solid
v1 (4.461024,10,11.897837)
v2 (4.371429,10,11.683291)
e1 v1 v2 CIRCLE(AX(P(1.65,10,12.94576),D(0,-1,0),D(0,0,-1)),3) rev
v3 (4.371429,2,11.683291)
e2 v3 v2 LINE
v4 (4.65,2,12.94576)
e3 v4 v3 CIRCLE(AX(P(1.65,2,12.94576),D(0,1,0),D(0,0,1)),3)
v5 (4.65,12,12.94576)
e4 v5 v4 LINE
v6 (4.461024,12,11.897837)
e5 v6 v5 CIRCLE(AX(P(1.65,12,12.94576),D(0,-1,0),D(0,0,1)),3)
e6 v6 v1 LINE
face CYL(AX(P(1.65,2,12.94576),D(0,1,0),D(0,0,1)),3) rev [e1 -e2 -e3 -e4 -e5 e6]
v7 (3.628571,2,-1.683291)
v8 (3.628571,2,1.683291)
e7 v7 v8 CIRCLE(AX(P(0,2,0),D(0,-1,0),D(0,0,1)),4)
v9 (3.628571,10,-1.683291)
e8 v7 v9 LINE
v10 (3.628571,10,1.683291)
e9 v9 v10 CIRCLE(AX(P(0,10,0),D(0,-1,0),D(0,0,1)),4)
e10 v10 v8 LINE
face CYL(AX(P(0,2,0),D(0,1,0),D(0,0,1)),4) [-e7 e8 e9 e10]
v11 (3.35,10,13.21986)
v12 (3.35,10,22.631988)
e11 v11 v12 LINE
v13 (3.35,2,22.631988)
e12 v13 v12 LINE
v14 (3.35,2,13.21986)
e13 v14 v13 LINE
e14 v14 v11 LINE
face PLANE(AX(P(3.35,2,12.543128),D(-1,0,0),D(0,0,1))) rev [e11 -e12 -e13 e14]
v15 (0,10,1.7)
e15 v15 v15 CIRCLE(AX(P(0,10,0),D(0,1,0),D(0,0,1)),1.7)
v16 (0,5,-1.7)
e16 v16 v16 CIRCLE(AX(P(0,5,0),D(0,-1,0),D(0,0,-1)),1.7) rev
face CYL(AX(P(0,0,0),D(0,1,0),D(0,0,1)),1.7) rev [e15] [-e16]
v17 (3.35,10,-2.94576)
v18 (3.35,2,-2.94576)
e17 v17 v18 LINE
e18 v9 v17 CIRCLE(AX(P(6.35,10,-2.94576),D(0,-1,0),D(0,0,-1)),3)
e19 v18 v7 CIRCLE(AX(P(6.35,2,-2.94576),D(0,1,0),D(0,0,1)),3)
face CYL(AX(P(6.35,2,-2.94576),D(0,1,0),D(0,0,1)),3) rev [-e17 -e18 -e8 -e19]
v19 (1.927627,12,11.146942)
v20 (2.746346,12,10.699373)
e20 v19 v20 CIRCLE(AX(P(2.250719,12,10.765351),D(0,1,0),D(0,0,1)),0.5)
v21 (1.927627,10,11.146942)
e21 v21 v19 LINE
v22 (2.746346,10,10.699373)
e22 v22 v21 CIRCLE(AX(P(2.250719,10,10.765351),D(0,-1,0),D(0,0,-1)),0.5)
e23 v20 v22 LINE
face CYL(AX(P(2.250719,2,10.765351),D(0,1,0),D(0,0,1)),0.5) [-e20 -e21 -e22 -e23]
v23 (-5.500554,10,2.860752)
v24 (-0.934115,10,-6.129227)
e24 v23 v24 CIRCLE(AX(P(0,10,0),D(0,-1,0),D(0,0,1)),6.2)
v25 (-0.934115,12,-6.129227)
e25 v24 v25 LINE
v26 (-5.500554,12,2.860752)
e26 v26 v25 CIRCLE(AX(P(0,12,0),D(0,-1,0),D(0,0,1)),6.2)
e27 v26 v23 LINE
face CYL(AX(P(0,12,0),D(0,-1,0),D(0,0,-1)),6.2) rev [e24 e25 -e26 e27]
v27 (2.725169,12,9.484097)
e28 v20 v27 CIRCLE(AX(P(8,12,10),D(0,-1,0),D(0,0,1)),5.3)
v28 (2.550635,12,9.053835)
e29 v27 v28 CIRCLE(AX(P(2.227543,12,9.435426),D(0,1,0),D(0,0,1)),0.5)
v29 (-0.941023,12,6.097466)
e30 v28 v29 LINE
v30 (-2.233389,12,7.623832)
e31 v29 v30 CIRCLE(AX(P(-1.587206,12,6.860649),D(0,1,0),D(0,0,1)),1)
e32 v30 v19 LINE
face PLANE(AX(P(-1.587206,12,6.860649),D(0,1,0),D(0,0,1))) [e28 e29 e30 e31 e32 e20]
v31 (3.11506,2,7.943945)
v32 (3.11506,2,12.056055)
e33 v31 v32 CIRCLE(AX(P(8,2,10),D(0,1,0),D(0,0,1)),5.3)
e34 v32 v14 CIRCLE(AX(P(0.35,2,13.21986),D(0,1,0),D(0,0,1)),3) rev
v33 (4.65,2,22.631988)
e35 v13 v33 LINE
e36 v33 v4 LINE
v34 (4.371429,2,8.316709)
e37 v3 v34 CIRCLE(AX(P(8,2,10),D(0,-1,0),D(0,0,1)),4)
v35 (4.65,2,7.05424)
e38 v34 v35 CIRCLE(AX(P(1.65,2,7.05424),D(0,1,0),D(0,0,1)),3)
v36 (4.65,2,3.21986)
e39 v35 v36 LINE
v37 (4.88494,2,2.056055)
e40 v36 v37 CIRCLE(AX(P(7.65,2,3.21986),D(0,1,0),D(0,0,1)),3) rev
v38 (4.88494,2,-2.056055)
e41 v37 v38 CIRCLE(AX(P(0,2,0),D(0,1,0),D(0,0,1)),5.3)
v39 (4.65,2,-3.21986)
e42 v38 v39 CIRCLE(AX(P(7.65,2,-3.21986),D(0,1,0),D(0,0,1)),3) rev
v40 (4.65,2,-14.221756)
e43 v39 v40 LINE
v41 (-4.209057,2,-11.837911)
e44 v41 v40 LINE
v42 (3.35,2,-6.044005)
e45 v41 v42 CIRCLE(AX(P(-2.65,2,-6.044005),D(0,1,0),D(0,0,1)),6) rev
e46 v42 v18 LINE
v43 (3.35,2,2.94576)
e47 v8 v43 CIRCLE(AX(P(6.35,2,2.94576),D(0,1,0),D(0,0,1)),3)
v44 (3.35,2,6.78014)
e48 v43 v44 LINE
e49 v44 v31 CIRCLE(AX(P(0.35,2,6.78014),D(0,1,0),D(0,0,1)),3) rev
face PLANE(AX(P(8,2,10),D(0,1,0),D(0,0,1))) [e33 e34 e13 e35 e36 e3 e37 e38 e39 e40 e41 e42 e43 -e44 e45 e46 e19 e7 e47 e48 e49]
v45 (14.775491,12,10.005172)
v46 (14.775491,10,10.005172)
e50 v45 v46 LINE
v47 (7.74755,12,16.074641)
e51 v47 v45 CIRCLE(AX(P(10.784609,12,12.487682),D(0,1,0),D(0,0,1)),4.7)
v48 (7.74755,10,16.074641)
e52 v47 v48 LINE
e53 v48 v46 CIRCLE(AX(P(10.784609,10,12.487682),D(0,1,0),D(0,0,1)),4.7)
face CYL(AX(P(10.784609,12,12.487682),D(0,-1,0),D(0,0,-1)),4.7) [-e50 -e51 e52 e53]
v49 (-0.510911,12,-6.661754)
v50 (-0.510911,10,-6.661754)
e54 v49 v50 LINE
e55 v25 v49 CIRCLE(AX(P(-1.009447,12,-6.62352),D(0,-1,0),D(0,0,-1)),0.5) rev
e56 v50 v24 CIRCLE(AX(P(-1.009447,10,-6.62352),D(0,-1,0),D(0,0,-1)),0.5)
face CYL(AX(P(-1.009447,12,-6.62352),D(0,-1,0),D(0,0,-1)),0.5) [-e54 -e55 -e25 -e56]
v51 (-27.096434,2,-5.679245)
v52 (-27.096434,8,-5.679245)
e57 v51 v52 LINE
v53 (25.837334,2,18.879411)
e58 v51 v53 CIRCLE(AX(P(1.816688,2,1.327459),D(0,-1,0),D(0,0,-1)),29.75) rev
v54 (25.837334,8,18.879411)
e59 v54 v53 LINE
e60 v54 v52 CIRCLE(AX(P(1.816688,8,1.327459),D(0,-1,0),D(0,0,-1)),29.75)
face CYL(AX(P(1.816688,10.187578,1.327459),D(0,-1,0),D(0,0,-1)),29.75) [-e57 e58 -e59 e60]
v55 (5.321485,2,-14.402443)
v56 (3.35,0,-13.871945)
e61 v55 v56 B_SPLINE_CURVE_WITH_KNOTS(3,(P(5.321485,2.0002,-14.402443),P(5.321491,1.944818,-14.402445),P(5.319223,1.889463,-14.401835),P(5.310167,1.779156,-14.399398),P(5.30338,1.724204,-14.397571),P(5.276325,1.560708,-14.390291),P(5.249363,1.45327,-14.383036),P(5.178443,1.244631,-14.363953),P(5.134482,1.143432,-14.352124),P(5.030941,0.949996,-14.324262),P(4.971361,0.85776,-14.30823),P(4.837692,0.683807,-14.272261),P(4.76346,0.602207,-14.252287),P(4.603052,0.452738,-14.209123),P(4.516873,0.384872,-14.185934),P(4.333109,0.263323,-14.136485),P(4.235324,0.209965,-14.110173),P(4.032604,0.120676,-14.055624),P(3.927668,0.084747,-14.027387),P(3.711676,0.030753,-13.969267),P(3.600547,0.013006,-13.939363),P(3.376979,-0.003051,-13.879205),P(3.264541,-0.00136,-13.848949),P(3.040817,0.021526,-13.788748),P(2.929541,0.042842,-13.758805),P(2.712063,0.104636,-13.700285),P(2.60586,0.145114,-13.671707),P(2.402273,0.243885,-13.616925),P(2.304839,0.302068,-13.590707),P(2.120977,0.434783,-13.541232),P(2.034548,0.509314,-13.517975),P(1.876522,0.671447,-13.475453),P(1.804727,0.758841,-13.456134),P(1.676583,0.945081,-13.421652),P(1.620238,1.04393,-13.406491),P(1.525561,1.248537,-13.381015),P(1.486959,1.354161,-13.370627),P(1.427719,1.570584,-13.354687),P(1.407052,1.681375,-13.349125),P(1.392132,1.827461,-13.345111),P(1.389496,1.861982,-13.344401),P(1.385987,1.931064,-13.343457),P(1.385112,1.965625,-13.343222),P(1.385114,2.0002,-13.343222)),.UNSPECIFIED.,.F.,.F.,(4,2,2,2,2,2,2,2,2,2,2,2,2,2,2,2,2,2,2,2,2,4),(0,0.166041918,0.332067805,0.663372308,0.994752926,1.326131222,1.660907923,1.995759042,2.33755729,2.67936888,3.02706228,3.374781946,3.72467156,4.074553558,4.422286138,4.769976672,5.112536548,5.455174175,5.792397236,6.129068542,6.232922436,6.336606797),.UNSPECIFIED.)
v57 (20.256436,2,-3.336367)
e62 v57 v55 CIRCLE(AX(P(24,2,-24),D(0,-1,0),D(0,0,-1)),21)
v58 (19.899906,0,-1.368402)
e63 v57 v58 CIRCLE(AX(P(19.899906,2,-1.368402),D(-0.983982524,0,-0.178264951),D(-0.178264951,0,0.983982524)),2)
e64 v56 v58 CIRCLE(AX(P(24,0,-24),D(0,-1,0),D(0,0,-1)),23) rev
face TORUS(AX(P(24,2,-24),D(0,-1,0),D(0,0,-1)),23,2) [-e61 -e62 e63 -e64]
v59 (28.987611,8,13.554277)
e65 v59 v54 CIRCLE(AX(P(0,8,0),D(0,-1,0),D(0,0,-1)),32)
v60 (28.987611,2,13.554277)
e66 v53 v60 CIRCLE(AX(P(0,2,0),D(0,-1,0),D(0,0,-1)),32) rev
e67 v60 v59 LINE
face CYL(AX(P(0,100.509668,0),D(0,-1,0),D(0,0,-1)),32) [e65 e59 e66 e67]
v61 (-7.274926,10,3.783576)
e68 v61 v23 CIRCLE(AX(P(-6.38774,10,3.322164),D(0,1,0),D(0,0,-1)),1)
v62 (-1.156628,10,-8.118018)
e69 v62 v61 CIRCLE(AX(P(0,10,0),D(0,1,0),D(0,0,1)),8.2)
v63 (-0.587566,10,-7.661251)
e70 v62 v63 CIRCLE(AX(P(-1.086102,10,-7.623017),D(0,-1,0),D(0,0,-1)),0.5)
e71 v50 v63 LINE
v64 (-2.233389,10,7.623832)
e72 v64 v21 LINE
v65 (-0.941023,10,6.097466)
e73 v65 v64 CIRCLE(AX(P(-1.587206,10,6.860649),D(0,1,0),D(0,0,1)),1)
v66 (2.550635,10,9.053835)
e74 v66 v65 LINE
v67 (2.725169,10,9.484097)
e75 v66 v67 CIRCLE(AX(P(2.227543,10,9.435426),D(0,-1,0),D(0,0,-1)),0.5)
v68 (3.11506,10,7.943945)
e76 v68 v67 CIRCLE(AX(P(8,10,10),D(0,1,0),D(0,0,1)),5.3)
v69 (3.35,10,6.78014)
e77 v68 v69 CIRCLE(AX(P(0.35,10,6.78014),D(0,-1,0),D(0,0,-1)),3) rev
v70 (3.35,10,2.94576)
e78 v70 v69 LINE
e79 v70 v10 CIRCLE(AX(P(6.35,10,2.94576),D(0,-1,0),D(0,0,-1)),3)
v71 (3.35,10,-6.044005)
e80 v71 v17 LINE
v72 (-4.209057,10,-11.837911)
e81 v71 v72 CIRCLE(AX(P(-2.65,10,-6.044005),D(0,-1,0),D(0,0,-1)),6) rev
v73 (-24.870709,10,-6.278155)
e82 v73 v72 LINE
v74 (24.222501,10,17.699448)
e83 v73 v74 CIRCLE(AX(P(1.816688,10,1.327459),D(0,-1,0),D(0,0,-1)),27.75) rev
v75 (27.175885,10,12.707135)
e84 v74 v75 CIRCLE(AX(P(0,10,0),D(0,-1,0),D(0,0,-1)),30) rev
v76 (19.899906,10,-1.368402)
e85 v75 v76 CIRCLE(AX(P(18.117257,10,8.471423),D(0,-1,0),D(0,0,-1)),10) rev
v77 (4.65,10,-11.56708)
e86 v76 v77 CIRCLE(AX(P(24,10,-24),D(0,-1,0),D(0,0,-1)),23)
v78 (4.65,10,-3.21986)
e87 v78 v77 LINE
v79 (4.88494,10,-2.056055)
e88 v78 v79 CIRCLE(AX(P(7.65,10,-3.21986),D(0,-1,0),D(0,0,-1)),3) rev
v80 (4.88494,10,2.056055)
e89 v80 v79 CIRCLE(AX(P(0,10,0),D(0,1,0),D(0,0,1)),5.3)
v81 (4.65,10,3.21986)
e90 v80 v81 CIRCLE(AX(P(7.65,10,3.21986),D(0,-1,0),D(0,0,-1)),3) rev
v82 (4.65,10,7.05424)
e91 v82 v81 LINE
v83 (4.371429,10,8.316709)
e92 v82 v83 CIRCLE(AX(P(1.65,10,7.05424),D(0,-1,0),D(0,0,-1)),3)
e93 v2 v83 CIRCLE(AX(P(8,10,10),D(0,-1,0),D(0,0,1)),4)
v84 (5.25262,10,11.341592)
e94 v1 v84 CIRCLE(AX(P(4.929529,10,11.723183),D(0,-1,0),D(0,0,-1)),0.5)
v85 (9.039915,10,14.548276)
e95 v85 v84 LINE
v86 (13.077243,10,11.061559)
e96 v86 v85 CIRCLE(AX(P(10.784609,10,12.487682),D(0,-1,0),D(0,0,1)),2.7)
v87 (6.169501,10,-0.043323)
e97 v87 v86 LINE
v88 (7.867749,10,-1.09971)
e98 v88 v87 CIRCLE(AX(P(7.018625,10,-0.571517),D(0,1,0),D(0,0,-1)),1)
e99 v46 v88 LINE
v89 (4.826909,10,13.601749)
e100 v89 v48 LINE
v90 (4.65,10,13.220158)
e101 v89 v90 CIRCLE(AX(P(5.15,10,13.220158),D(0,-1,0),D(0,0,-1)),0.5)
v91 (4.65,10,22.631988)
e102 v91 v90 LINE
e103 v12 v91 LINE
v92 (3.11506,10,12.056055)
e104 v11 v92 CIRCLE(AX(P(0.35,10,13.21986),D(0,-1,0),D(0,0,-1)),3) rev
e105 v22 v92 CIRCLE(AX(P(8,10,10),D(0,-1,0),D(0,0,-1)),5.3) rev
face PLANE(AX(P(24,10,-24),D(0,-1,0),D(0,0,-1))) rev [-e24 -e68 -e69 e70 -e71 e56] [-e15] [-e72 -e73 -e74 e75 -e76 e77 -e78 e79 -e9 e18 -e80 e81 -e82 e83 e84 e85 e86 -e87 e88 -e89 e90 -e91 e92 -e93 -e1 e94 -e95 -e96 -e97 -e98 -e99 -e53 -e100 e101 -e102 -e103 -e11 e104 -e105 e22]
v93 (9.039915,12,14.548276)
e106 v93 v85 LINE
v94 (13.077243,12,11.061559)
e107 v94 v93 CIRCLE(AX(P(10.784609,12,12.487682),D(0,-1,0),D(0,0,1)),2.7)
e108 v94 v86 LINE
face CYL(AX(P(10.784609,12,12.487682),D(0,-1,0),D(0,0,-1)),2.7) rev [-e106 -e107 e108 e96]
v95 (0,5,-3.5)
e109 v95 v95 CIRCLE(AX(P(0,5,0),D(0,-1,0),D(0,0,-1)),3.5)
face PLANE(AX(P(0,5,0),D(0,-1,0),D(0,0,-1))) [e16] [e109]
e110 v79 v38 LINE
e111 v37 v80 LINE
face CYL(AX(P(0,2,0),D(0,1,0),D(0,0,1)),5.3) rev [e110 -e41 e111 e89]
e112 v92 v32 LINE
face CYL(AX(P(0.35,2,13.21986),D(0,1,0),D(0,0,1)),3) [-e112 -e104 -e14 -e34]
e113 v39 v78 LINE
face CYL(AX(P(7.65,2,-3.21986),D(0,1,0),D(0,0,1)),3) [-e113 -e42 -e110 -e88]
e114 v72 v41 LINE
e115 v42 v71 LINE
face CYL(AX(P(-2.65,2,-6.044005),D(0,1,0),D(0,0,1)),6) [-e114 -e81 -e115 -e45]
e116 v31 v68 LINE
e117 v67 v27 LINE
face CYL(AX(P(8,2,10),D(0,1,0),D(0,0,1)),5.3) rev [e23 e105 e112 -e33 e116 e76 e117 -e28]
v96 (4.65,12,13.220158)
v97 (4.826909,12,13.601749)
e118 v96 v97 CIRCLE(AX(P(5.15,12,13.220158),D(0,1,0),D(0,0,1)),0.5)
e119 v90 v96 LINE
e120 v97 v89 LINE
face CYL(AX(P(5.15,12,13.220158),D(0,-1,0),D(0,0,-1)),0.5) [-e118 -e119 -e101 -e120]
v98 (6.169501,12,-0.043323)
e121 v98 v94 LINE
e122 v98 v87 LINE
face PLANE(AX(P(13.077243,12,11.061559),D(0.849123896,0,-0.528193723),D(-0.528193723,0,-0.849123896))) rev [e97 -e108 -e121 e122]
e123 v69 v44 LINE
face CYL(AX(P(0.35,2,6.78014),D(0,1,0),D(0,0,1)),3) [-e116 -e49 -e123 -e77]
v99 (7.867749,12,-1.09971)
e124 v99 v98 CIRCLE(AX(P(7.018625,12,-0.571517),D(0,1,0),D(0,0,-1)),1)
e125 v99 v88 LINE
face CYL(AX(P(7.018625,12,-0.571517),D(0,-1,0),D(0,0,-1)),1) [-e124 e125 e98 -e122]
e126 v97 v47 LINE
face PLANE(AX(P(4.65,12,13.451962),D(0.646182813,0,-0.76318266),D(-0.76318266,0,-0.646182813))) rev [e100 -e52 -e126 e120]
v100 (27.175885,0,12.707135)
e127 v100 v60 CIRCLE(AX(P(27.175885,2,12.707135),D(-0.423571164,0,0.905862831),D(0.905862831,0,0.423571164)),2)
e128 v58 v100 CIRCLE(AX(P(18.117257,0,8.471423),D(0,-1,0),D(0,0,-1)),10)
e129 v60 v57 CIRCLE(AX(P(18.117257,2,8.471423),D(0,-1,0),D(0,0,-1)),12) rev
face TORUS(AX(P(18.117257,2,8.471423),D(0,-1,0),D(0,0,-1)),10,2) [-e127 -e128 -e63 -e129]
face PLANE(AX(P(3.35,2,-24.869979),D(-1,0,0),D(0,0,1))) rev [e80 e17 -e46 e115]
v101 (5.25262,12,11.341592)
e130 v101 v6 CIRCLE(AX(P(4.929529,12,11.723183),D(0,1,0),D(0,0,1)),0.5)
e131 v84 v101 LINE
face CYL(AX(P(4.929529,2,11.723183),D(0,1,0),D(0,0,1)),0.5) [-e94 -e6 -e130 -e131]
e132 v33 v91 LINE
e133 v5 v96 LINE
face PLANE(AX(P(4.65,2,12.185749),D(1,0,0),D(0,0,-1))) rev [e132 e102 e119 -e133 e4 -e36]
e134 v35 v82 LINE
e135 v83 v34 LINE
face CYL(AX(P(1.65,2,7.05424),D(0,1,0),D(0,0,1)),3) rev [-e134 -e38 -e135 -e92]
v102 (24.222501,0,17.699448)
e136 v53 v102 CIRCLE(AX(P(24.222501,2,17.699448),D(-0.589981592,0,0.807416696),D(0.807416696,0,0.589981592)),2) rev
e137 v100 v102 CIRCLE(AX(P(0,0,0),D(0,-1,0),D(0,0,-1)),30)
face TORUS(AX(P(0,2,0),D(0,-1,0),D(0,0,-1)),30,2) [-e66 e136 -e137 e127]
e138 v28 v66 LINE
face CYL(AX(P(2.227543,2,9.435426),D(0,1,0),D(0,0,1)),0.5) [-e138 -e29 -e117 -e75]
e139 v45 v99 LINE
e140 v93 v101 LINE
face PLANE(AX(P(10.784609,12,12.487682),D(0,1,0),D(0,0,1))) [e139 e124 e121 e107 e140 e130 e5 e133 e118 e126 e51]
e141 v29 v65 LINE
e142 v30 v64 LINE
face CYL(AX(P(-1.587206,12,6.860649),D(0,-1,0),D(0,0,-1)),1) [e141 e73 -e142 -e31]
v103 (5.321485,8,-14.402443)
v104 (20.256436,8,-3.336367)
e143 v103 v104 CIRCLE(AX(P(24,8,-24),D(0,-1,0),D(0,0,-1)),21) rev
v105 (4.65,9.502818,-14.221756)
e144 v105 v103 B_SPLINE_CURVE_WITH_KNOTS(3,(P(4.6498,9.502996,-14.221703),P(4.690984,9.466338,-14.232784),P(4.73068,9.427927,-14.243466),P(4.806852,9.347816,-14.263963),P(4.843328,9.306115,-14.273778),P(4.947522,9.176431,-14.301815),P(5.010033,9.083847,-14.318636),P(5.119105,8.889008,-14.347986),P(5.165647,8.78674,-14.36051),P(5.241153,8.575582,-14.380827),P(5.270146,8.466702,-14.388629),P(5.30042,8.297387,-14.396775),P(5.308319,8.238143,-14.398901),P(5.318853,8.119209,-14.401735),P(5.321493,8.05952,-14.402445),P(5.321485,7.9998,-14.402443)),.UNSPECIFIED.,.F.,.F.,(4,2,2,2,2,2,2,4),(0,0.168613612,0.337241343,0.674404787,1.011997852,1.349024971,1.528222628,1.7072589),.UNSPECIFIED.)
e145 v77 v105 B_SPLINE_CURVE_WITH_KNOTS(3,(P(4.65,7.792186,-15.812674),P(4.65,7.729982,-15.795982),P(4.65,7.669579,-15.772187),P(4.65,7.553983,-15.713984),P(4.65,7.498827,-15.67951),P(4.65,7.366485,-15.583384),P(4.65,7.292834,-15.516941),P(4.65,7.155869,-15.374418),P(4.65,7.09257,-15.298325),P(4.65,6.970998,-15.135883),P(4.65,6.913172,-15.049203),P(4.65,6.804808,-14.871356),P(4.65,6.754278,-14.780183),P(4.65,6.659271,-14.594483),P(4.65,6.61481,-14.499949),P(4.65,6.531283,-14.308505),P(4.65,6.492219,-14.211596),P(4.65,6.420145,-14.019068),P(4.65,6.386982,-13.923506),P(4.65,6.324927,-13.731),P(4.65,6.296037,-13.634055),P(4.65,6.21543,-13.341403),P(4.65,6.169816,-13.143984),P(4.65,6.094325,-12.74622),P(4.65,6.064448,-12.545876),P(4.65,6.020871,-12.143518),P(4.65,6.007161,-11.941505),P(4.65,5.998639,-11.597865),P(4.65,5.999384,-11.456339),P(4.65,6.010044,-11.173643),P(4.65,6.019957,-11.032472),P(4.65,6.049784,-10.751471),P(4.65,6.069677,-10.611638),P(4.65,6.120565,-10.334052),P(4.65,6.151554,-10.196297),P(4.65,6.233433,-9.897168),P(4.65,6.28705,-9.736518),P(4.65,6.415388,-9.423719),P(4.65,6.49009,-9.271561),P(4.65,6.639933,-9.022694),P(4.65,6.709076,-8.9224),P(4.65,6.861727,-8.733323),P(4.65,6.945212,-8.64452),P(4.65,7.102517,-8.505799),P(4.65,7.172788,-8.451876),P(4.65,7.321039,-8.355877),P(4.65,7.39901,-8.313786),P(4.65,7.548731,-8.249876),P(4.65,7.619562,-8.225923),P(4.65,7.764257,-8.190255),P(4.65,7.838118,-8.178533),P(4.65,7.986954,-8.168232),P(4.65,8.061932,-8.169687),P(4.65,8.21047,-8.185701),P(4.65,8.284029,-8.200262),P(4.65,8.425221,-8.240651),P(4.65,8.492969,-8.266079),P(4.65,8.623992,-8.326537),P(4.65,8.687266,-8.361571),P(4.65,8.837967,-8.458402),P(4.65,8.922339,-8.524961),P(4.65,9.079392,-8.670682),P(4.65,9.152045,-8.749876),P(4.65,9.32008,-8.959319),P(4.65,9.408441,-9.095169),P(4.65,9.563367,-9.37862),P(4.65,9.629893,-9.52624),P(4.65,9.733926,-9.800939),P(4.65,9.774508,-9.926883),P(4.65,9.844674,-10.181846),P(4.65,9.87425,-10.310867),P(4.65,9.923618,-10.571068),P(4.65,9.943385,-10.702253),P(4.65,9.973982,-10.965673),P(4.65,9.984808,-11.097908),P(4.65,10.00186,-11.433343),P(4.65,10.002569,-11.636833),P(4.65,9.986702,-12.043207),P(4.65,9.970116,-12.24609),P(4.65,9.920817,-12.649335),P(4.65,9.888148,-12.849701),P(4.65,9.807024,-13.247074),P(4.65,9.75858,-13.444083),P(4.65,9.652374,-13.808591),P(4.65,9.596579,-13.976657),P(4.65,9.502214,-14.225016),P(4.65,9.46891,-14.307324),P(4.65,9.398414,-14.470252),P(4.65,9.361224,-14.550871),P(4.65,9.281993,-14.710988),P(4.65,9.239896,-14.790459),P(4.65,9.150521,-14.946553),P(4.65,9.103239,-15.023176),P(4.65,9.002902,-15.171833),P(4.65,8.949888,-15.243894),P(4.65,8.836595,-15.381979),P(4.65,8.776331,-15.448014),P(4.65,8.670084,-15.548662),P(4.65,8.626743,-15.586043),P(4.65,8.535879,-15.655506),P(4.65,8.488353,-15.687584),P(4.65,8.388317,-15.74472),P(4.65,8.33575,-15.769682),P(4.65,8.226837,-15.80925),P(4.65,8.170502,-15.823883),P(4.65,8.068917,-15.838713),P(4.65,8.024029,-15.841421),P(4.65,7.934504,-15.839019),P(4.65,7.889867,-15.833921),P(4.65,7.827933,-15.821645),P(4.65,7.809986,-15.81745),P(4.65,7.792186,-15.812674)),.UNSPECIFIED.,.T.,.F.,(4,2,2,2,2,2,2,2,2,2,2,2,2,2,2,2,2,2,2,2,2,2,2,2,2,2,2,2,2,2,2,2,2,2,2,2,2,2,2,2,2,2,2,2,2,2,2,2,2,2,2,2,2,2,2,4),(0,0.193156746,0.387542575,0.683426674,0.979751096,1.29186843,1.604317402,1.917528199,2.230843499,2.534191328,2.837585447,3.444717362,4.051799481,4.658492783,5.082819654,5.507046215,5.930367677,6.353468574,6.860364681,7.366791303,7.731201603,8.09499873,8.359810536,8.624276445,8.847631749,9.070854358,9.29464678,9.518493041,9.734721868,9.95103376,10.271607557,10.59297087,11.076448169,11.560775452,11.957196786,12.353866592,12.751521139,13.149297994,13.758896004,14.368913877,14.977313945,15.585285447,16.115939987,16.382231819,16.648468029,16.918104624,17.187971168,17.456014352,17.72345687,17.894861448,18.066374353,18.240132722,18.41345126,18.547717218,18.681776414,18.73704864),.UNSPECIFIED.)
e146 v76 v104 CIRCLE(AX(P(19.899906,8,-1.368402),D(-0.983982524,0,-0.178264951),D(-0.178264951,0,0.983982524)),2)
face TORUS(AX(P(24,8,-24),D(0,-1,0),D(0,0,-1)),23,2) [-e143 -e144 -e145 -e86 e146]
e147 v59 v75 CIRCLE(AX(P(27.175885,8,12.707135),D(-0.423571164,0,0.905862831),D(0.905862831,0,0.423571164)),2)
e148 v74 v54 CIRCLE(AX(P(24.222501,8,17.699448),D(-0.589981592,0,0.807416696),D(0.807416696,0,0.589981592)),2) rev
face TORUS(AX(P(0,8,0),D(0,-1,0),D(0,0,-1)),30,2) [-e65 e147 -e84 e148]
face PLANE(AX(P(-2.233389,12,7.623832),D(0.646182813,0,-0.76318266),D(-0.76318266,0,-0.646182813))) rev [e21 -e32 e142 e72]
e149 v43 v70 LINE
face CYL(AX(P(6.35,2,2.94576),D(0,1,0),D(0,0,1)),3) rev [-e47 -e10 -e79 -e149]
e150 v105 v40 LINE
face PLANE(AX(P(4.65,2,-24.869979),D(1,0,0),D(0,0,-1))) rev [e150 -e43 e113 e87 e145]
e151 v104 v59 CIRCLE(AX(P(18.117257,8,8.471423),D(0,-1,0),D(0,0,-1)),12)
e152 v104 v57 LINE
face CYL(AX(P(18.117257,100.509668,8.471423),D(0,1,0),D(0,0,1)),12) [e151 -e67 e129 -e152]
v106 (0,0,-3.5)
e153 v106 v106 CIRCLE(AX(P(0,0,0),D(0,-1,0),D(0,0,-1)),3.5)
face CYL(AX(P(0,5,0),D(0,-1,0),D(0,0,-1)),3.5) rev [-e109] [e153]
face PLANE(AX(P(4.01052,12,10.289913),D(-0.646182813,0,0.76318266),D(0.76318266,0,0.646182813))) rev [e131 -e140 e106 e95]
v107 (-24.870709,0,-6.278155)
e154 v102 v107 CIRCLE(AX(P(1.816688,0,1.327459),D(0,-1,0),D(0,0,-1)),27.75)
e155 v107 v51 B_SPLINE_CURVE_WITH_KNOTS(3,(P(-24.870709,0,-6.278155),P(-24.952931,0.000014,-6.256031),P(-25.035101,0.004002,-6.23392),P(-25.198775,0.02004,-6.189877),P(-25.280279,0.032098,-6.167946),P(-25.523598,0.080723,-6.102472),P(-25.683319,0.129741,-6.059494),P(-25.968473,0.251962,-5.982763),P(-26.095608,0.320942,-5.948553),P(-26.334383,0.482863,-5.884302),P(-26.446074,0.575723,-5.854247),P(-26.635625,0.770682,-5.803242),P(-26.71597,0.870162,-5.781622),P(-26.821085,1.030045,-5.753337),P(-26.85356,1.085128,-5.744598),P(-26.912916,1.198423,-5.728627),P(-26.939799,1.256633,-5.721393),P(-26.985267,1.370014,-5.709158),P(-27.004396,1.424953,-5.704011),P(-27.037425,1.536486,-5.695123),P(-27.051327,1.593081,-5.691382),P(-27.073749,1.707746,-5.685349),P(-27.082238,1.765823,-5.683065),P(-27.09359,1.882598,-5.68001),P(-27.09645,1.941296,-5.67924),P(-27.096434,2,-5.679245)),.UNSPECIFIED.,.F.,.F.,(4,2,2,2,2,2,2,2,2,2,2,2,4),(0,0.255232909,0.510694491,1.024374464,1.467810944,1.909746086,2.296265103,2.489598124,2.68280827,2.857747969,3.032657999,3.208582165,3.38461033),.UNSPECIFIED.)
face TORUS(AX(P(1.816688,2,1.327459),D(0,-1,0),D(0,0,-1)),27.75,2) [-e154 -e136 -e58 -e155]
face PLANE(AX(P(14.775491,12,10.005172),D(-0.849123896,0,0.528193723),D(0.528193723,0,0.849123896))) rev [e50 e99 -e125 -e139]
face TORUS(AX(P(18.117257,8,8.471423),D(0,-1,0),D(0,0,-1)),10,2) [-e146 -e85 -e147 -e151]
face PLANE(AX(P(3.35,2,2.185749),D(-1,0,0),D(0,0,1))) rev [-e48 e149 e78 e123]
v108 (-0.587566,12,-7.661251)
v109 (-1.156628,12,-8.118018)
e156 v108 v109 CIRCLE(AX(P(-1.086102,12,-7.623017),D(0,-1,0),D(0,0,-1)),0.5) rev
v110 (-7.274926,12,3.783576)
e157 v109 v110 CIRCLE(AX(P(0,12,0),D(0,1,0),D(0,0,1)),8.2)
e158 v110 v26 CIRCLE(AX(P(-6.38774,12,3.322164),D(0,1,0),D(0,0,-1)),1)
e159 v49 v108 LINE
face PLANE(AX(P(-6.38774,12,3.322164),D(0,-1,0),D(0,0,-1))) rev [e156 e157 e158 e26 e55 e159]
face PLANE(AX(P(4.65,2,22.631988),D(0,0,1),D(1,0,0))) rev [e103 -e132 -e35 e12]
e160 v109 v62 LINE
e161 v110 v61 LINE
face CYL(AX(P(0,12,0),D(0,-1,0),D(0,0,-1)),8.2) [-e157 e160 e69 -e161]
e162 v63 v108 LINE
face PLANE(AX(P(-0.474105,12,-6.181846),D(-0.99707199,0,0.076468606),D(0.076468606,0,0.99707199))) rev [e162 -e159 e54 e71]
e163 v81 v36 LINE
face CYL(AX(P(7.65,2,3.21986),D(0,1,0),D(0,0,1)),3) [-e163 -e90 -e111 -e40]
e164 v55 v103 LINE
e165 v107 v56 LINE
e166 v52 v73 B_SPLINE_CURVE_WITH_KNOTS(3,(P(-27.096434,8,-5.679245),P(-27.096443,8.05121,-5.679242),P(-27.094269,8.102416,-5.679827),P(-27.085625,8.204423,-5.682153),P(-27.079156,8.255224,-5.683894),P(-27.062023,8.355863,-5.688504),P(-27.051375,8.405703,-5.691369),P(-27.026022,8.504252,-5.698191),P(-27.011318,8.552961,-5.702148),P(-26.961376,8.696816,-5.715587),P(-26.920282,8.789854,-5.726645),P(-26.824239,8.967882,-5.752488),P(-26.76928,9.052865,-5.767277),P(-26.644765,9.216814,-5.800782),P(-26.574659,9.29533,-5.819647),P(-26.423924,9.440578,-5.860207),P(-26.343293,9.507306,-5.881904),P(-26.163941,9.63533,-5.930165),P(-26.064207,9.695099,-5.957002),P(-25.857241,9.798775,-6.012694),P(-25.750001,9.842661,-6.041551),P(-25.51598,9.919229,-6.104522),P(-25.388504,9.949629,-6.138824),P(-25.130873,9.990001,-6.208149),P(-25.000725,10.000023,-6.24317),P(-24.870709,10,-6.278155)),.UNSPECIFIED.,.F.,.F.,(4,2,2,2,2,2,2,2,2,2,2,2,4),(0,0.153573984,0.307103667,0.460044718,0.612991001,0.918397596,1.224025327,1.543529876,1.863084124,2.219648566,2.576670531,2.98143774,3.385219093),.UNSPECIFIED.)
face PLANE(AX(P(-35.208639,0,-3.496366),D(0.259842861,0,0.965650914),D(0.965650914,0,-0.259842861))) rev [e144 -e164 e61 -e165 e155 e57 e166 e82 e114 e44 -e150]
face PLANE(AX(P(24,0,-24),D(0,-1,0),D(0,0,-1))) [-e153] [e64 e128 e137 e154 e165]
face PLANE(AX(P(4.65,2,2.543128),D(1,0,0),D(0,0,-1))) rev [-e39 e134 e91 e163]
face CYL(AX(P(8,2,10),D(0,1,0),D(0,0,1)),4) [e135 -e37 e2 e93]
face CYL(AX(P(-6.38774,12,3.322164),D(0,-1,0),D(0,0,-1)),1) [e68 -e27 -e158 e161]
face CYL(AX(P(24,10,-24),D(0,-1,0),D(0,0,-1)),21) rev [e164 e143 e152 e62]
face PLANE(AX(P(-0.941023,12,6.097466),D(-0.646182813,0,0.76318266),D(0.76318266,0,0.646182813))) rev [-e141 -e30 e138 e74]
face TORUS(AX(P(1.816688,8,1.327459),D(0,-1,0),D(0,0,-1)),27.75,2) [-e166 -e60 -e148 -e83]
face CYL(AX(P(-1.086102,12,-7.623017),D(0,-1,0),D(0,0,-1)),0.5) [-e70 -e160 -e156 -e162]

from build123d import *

# Parameters (mm, degrees)
BOSS_EXTRUDE1_DEPTH  = 10
BOSS_EXTRUDE8_START  = -10
BOSS_EXTRUDE8_DEPTH  = 10
BOSS_EXTRUDE11_DEPTH = 10
SKETCH10_R           = 1.7000000000000002
CUT_EXTRUDE1_DEPTH   = 47.34652090502587
SKETCH13_R           = 3.5
CUT_EXTRUDE2_DEPTH   = 5
FILLET11_R           = 12
FILLET1_R            = 2
CUT_EXTRUDE5_DEPTH   = 47.346521064692666
CUT_EXTRUDE6_DEPTH   = 8
FILLET12_R           = 3
BOSS_EXTRUDE12_DEPTH = 2
FILLET16_R           = 0.5
CUT_EXTRUDE8_DEPTH   = 10
FILLET22_R           = 6
FILLET23_ANGLE       = 159.751266


with BuildPart() as part:
    # Sketch1 → Boss-Extrude1 (new body)
    with BuildSketch(Plane(origin=(0, 0, 0), x_dir=(1, 0, 0), z_dir=(0, 1, 0))):
        with BuildLine():
            Line((-29, 3.0000000000000027), (-24, 3.0000000000000027))
            ThreePointArc((-24, 3.0000000000000027), (-9.150757595082503, 9.150757595082506), (-3.0000000000000027, 24.000000000000004))
            Line((-3.0000000000000027, 24.000000000000004), (-2.999999999999995, 28.999999999999996))
            Line((-2.999999999999995, 28.999999999999996), (1.4e-16, 28.999999999999993))
            Line((1.4e-16, 28.999999999999993), (2.999999999999999, 28.999999999999996))
            Line((2.999999999999999, 28.999999999999996), (2.999999999999999, 23.999999999999996))
            ThreePointArc((2.999999999999999, 23.999999999999996), (9.150757595082506, 9.1507575950825), (24.000000000000004, 3))
            Line((24.000000000000004, 3), (28.999999999999996, 2.9999999999999933))
            Line((28.999999999999996, 2.9999999999999933), (28.99999999999999, -3.04e-15))
            Line((28.99999999999999, -3.04e-15), (28.999999999999996, -3.0000000000000013))
            Line((28.999999999999996, -3.0000000000000013), (23.999999999999993, -3.0000000000000018))
            ThreePointArc((23.999999999999993, -3.0000000000000018), (9.150757595082498, -9.150757595082506), (2.999999999999999, -24.000000000000007))
            Line((2.999999999999999, -24.000000000000007), (2.9999999999999933, -29))
            Line((2.9999999999999933, -29), (2.17e-15, -28.999999999999996))
            Line((2.17e-15, -28.999999999999996), (-2.9999999999999947, -29.000000000000007))
            Line((-2.9999999999999947, -29.000000000000007), (-2.9999999999999956, -24.000000000000004))
            ThreePointArc((-2.9999999999999956, -24.000000000000004), (-9.150757595082506, -9.150757595082512), (-24, -3.0000000000000115))
            Line((-24, -3.0000000000000115), (-29, -3.000000000000008))
            Line((-29, -3.000000000000008), (-29, 9e-17))
            Line((-29, 9e-17), (-29, 3.0000000000000027))
        make_face()
    extrude(amount=BOSS_EXTRUDE1_DEPTH)

    # Sketch9 → Boss-Extrude8 (add)
    with BuildSketch(Plane(origin=(0, 10, 0), x_dir=(1, 0, 0), z_dir=(0, 1, 0)).offset(BOSS_EXTRUDE8_START)):
        with BuildLine():
            Line((-4.201010126776677, -31.000000000000007), (2.9999999999999942, -31.000000000000007))
            Line((2.9999999999999942, -31.000000000000007), (2.9999999999999933, -29))
            Line((2.9999999999999933, -29), (-2.9999999999999947, -29.000000000000007))
            Line((-2.9999999999999947, -29.000000000000007), (-3.0000000000000027, -24.000000000000004))
            ThreePointArc((-3.0000000000000027, -24.000000000000004), (-3.3024302472767424, -27.551141553241024), (-4.201010126776677, -31.000000000000007))
        make_face()
        with BuildLine():
            Line((-31.000000000000007, -2.999999999999996), (-29, -2.999999999999995))
            Line((-29, -2.999999999999995), (-29.000000000000007, 2.9999999999999933))
            Line((-29.000000000000007, 2.9999999999999933), (-24.000000000000004, 3.0000000000000013))
            ThreePointArc((-24.000000000000004, 3.0000000000000013), (-27.551141553241024, 3.3024302472767424), (-31.000000000000007, 4.2010101267766755))
            Line((-31.000000000000007, 4.2010101267766755), (-31.000000000000007, -2.999999999999996))
        make_face()
        with BuildLine():
            Line((-2.9999999999999982, 31.000000000000007), (-2.9999999999999973, 29))
            Line((-2.9999999999999973, 29), (2.9999999999999916, 29.000000000000007))
            Line((2.9999999999999916, 29.000000000000007), (2.9999999999999996, 24.000000000000004))
            ThreePointArc((2.9999999999999996, 24.000000000000004), (3.302430247276739, 27.551141553241024), (4.201010126776674, 31.00000000000001))
            Line((4.201010126776674, 31.00000000000001), (-2.9999999999999982, 31.000000000000007))
        make_face()
        with BuildLine():
            Line((31.000000000000007, 3), (29, 2.999999999999999))
            Line((29, 2.999999999999999), (29.000000000000007, -2.99999999999999))
            Line((29.000000000000007, -2.99999999999999), (24.000000000000004, -2.9999999999999982))
            ThreePointArc((24.000000000000004, -2.9999999999999982), (27.551141553241024, -3.3024302472767353), (31.00000000000001, -4.201010126776672))
            Line((31.00000000000001, -4.201010126776672), (31.000000000000007, 3))
        make_face()
    extrude(amount=BOSS_EXTRUDE8_DEPTH)

    # Sketch15 → Boss-Extrude11 (add)
    with BuildSketch(Plane.XZ):
        with BuildLine():
            Line((31.000000000000007, -3), (24.000000000000004, -3))
            ThreePointArc((24.000000000000004, -3), (6.853571800517752, -11.875644347017863), (4.201010126776674, -31.00000000000001))
            Line((4.201010126776674, -31.00000000000001), (4.444888692211387, -31.689792749619734))
            ThreePointArc((4.444888692211387, -31.689792749619734), (-23.13590951240458, 22.107231645636396), (31.859064644147985, -3))
            Line((31.859064644147985, -3), (31.000000000000007, -3))
        make_face()
    extrude(amount=-BOSS_EXTRUDE11_DEPTH)

    # Sketch10 → Cut-Extrude1 (cut, through all)
    with BuildSketch(Plane(origin=(0, 10, 0), x_dir=(1, 0, 0), z_dir=(0, 1, 0))):
        with Locations(Location((0, 0, 0), (0, 0, 270))):
            Circle(SKETCH10_R)
    extrude(amount=-CUT_EXTRUDE1_DEPTH, mode=Mode.SUBTRACT)

    # Sketch13 → Cut-Extrude2 (cut)
    with BuildSketch(Plane.XZ):
        with Locations(Location((0, 0, 0), (0, 0, 270))):
            Circle(SKETCH13_R)
    extrude(amount=-CUT_EXTRUDE2_DEPTH, mode=Mode.SUBTRACT)

    # Fillet11
    fillet11_edges = [part.edges().sort_by_distance(p)[0] for p in [
        (31.859064644147985, 5, -2.9999999999999902),
    ]]
    fillet(fillet11_edges, radius=FILLET11_R)

    # Fillet1
    # the kernel refuses this fillet: 2 mm, written as the material it takes off along each edge
    with BuildSketch(Plane(origin=(2.22e-15, 10, 1.33e-15), x_dir=(0.29179218570712273, 0, -0.9564817407354205), z_dir=(0.9564817407354205, 0, 0.29179218570712273))) as fillet1_piece_1:
        with BuildLine():
            CenterArc((32 - FILLET1_R, -FILLET1_R), FILLET1_R, 0, 90)
            Line((32, -FILLET1_R), (32, 0))
            Line((32, 0), (32 - FILLET1_R, 0))
        make_face()
    fillet1_piece_1_solid = revolve(axis=Axis((2.22e-15, 10, 1.33e-15), (0, 1, 0)), revolution_arc=261.9050258296566, mode=Mode.PRIVATE)
    with BuildSketch(Plane(origin=(2.22e-15, 0, 1.33e-15), x_dir=(0.29179218570712273, 0, -0.9564817407354205), z_dir=(0.9564817407354205, 0, 0.29179218570712273))) as fillet1_piece_2:
        with BuildLine():
            CenterArc((32 - FILLET1_R, FILLET1_R), FILLET1_R, 270, 90)
            Line((32 - FILLET1_R, -2.2e-16), (32, 0))
            Line((32, 0), (32, FILLET1_R))
        make_face()
    fillet1_piece_2_solid = revolve(axis=Axis((2.22e-15, 0, 1.33e-15), (0, 1, 0)), revolution_arc=261.9050258296566, mode=Mode.PRIVATE)
    with BuildSketch(Plane(origin=(23.999999999999996, 10, -23.999999999999996), x_dir=(-0.17826495087308294, 0, 0.9839825238743914), z_dir=(0.9839825238743914, 0, 0.17826495087308294))) as fillet1_piece_3:
        with BuildLine():
            CenterArc((20.999999999999993 + FILLET1_R, FILLET1_R), FILLET1_R, 180, 90)
            Line((20.999999999999993, FILLET1_R), (20.999999999999993, 0))
            Line((20.999999999999993, 0), (20.999999999999993 + FILLET1_R, 0))
        make_face()
    fillet1_piece_3_solid = revolve(axis=Axis((23.999999999999996, 10, -23.999999999999996), (0, -1, 0)), revolution_arc=99.20250624888376, mode=Mode.PRIVATE)
    with BuildSketch(Plane(origin=(24.000000000000327, 0, -23.99999999999994), x_dir=(-0.9428090415820639, 0, -0.3333333333333315), z_dir=(0.3333333333333315, 0, -0.9428090415820639))) as fillet1_piece_4:
        with BuildLine():
            CenterArc((21.000000000000327 + FILLET1_R, FILLET1_R), FILLET1_R, 180, 90.00000000000205)
            Line((21.000000000000327 + FILLET1_R, -2.2e-16), (21.000000000000327, 0))
            Line((21.000000000000327, 0), (21.000000000000252, FILLET1_R))
        make_face()
    fillet1_piece_4_solid = revolve(axis=Axis((24.000000000000327, 0, -23.99999999999994), (0, 1, 0)), revolution_arc=99.20250624888268, mode=Mode.PRIVATE)
    with BuildSketch(Plane(origin=(18.117256620069544, 10, 8.471423288433229), x_dir=(0.17826495095489336, 0, -0.9839825238595701), z_dir=(-0.9839825238595701, 0, -0.17826495095489336))) as fillet1_piece_5:
        with BuildLine():
            CenterArc((12.000000000768473 - FILLET1_R, FILLET1_R), FILLET1_R, 270, 90.00000000000006)
            Line((12.000000000768473 + FILLET1_R * 2.454392245e-10, FILLET1_R), (12.000000000768473, 0))
            Line((12.000000000768473, 0), (12.000000000768473 - FILLET1_R, 0))
        make_face()
    fillet1_piece_5_solid = revolve(axis=Axis((18.117256620069544, 10, 8.471423288433229), (0, -1, 0)), revolution_arc=104.79154184638253, mode=Mode.PRIVATE)
    with BuildSketch(Plane(origin=(18.11725662006955, 0, 8.471423288433234), x_dir=(0.17826495095489273, 0, -0.9839825238595703), z_dir=(-0.9839825238595703, 0, -0.17826495095489273))) as fillet1_piece_6:
        with BuildLine():
            CenterArc((12.00000000076848 - FILLET1_R, -FILLET1_R), FILLET1_R, 0, 89.9999999999998)
            Line((12.00000000076848 - FILLET1_R, 2.2e-16), (12.00000000076848, 0))
            Line((12.00000000076848, 0), (12.00000000076848 + FILLET1_R * 2.45428566359e-10, -FILLET1_R))
        make_face()
    fillet1_piece_6_solid = revolve(axis=Axis((18.11725662006955, 0, 8.471423288433234), (0, -1, 0)), revolution_arc=104.79154184638256, mode=Mode.PRIVATE)
    with BuildSketch(Plane(origin=(4.201010126776674, 0, -31.00000000000001), x_dir=(0, 1, 0), z_dir=(0.3333333333333364, 0, -0.9428090415820624))) as fillet1_piece_7:
        with BuildLine():
            CenterArc((FILLET1_R, -FILLET1_R), FILLET1_R, 90, 89.99999999999997)
            Line((-2.2e-16, -FILLET1_R), (0, 0))
            Line((0, 0), (FILLET1_R, 0))
        make_face()
    fillet1_piece_7_solid = extrude(amount=5.731635696304131, mode=Mode.PRIVATE)
    with BuildSketch(Plane(origin=(4.201010126776674, 10, -31.00000000000001), x_dir=(-0.9428090415820624, 0, -0.3333333333333364), z_dir=(0.3333333333333364, 0, -0.9428090415820624))) as fillet1_piece_8:
        with BuildLine():
            CenterArc((FILLET1_R, -FILLET1_R), FILLET1_R, 90, 90)
            Line((-8.4e-16, -FILLET1_R), (0, 0))
            Line((0, 0), (FILLET1_R, 0))
        make_face()
    fillet1_piece_8_solid = extrude(amount=5.731635696304131, mode=Mode.PRIVATE)
    add([fillet1_piece_1_solid, fillet1_piece_2_solid, fillet1_piece_3_solid, fillet1_piece_4_solid, fillet1_piece_5_solid, fillet1_piece_6_solid, fillet1_piece_7_solid, fillet1_piece_8_solid], mode=Mode.SUBTRACT)

    # Sketch19 → Cut-Extrude5 (cut, through all)
    with BuildSketch(Plane.XZ):
        with BuildLine():
            Line((4.201010126776674, -31.00000000000001), (4.444888692211387, -31.689792749619734))
            ThreePointArc((4.444888692211387, -31.689792749619734), (-29.471415770690026, 12.467383545520837), (25.83733427301488, 18.87941094590854))
            ThreePointArc((25.83733427301488, 18.87941094590854), (-15.73526479770299, 25.348105289077708), (-22.20395914087216, -16.224493781640145))
            ThreePointArc((-22.20395914087216, -16.224493781640145), (-12.451434074131708, -24.519620500683775), (0, -27.5))
            Line((0, -27.5), (3.2937207591513458, -27.5))
            ThreePointArc((3.2937207591513458, -27.5), (3.6718986006846066, -29.269562932459532), (4.201010126776674, -31.00000000000001))
        make_face()
    extrude(amount=-CUT_EXTRUDE5_DEPTH, mode=Mode.SUBTRACT)

    # Sketch21 → Cut-Extrude6 (cut)
    with BuildSketch(Plane(origin=(0, 10, 0), x_dir=(1, 0, 0), z_dir=(0, 1, 0))):
        with BuildLine():
            Line((3.3499999999999996, -2.1857492994394403), (3.3500000000000005, -7.456872004794096))
            ThreePointArc((3.3500000000000005, -7.456872004794096), (2.7, -10.000000000000002), (3.3500000000000014, -12.543127995205907))
            Line((3.3500000000000014, -12.543127995205907), (3.3500000000000014, -22.6319878215018))
            Line((3.3500000000000014, -22.6319878215018), (4.6499999999999995, -22.6319878215018))
            Line((4.6499999999999995, -22.6319878215018), (4.6499999999999995, -12.18574929943944))
            ThreePointArc((4.6499999999999995, -12.18574929943944), (3.999999999999999, -10), (4.65, -7.814250700560559))
            Line((4.65, -7.814250700560559), (4.6499999999999995, -2.5431279952059045))
            ThreePointArc((4.6499999999999995, -2.5431279952059045), (5.3, 0), (4.6499999999999995, 2.5431279952059045))
            Line((4.6499999999999995, 2.5431279952059045), (4.649999999999999, 24.86997922175309))
            Line((4.649999999999999, 24.86997922175309), (3.3499999999999983, 24.86997922175309))
            Line((3.3499999999999983, 24.86997922175309), (3.3499999999999996, 2.1857492994394403))
            ThreePointArc((3.3499999999999996, 2.1857492994394403), (4, 0), (3.3499999999999996, -2.1857492994394403))
        make_face()
    extrude(amount=-CUT_EXTRUDE6_DEPTH, mode=Mode.SUBTRACT)

    # Fillet12
    fillet12_edges = [part.edges().sort_by_distance(p)[0] for p in [
        (3.3499999999999996, 6, -2.1857492994394403),
        (3.3500000000000014, 6, 12.543127995205907),
        (3.35, 6, 7.456872004794096),
        (3.3499999999999996, 6, 2.18574929943944),
        (4.65, 6, -2.543127995205904),
        (4.6499999999999995, 6, 2.5431279952059045),
        (4.65, 6, 7.81425070056056),
        (4.65, 6, 12.18574929943944),
    ]]
    fillet(fillet12_edges, radius=FILLET12_R)

    # Sketch22 → Boss-Extrude12 (add)
    with BuildSketch(Plane(origin=(0, 10, 0), x_dir=(1, 0, 0), z_dir=(0, 1, 0))):
        with BuildLine():
            Line((-0.9410232794524035, -6.097466413975398), (2.7565050622575002, -9.228144548591665))
            ThreePointArc((2.7565050622575002, -9.228144548591665), (2.7420947888784566, -10.66665792642172), (3.1150602409638557, -12.056055337433282))
            ThreePointArc((3.1150602409638557, -12.056055337433282), (3.1441141140573974, -12.127648582033496), (3.1713146449834664, -12.199966293083152))
            Line((3.1713146449834664, -12.199966293083152), (-2.233388905668836, -7.623831733344979))
            ThreePointArc((-2.233388905668836, -7.623831733344979), (-2.3503887522454106, -6.214466260551973), (-0.9410232794524035, -6.097466413975398))
        make_face()
        with BuildLine():
            Line((13.077243434064954, -11.061559301183609), (6.169501164246992, 0.04332281597879976))
            ThreePointArc((6.169501164246992, 0.04332281597879976), (6.490431337307185, 1.420640435128268), (7.867748956456652, 1.0997102620680754))
            Line((7.867748956456652, 1.0997102620680754), (14.775491226274623, -10.005171855094346))
            ThreePointArc((14.775491226274623, -10.005171855094346), (13.856588423584014, -16.044779751040444), (7.747549692973299, -16.074640853922645))
            Line((7.747549692973299, -16.074640853922645), (4.650000000000001, -13.451961539936832))
            Line((4.650000000000001, -13.451961539936832), (4.6499999999999995, -12.945759664331089))
            ThreePointArc((4.6499999999999995, -12.945759664331089), (4.579529460023035, -12.299340958802588), (4.371428571428571, -11.683291236760622))
            ThreePointArc((4.371428571428571, -11.683291236760622), (4.1277844849000065, -11.002969094548227), (4.010519991510903, -10.289912507260095))
            Line((4.010519991510903, -10.289912507260095), (9.039915319189735, -14.548275534553065))
            ThreePointArc((9.039915319189735, -14.548275534553065), (12.549363100604399, -14.531121283961152), (13.077243434064954, -11.061559301183609))
        make_face()
        with BuildLine():
            Line((-0.4741053578997305, 6.18184633500468), (-0.6270425701254502, 8.17599031403845))
            ThreePointArc((-0.6270425701254502, 8.17599031403845), (-7.167153081897932, 3.983957417021553), (-7.2749264719064, -3.7835756670582867))
            ThreePointArc((-7.2749264719064, -3.7835756670582867), (-5.926328650081439, -4.209350155454398), (-5.500554161685327, -2.860752333629438))
            ThreePointArc((-5.500554161685327, -2.860752333629438), (-5.41906696436185, 3.012260486040686), (-0.4741053578997305, 6.18184633500468))
        make_face()
    extrude(amount=BOSS_EXTRUDE12_DEPTH)

    # Fillet16
    # the kernel refuses this fillet: 0.5 mm, written as the material it takes off along each edge
    with BuildSketch(Plane(origin=(4.650000000000001, 10, 13.451961539936832), x_dir=(-7.66e-15, 0, -1), z_dir=(0, 1, 0))) as fillet16_piece_1:
        with BuildLine():
            CenterArc((FILLET16_R * 0.463607476404, -FILLET16_R), FILLET16_R, 89.99999999999957, 49.74558323396275)
            Line((-FILLET16_R * 0.299575183281, -FILLET16_R * 0.353817186892), (0, 0))
            Line((0, 0), (FILLET16_R * 0.463607476404, 0))
        make_face()
    extrude(amount=2.5795093455050413, mode=Mode.SUBTRACT)
    with BuildSketch(Plane(origin=(4.010519991510904, 10, 10.289912507260095), x_dir=(0.7631826596847906, 0, 0.646182813108217), z_dir=(0, 1, 0))) as fillet16_piece_2:
        with BuildLine():
            CenterArc((1.627526423263627, -0.5), FILLET16_R, 90.00000000000003, 150.6993809006728)
            Line((1.3828304859089908, -0.9360319922232039), (1.358360892173527, -0.9796351914455242))
            ThreePointArc((1.358360892173527, -0.9796351914455242), (1.1547971954901433, -0.8755568029870049), (-0.03571706855176803, -0.03498987016363905))
            Line((-0.03571706855176803, -0.03498987016363905), (1.3e-16, 0.04999999999999941))
            Line((1.3e-16, 0.04999999999999941), (1.627526423263627, 0.04999999999999934))
            Line((1.627526423263627, 0.04999999999999934), (1.6275264232636268, -1e-16))
        make_face()
    extrude(amount=6.174607798363095, mode=Mode.SUBTRACT)
    with BuildSketch(Plane(origin=(3.1713146449834664, 10, 12.199966293083152), x_dir=(-0.7631826596847914, 0, -0.6461828131082161), z_dir=(0, 1, 0))) as fillet16_piece_3:
        with BuildLine():
            CenterArc((1.6296066509961113, -0.5), FILLET16_R, 89.99999999999994, 137.8371168074777)
            Line((1.2939863772884717, -0.8706197942317832), (1.2604243499177077, -0.9076817736549612))
            ThreePointArc((1.2604243499177077, -0.9076817736549612), (0.11328825017861112, -0.1180618856839784), (-0.0249023411896119, -0.04335750688492294))
            Line((-0.0249023411896119, -0.04335750688492294), (5.2e-16, 0.0499999999999997))
            Line((5.2e-16, 0.0499999999999997), (1.6296066509961122, 0.04999999999999945))
            Line((1.6296066509961122, 0.04999999999999945), (1.6296066509961118, -1.2e-16))
        make_face()
    extrude(amount=6.0740166274902805, mode=Mode.SUBTRACT)
    with BuildSketch(Plane(origin=(2.7565050622575002, 10, 9.228144548591665), x_dir=(-0.12152264594318536, 0, 0.9925886592758187), z_dir=(0, 1, 0))) as fillet16_piece_4:
        with BuildLine():
            CenterArc((0.27002653512611713, -0.4998520308409607), FILLET16_R, 91.39395560283157, 55.3316145811082)
            Line((-0.14799961395938357, -0.22552715285730596), (0, 0))
            ThreePointArc((0, 0), (0.12893158884399894, -0.00156847308581748), (0.25786317768800077, 0))
        make_face()
    extrude(amount=2.674381116320962, mode=Mode.SUBTRACT)
    with BuildSketch(Plane(origin=(-0.4741053578997304, 10, -6.18184633500468), x_dir=(-0.9935213727873651, 0, 0.11364542144191084), z_dir=(0, 1, 0))) as fillet16_piece_5:
        with BuildLine():
            CenterArc((0.48167918797674125, -0.4996513193807079), FILLET16_R, 92.1398916001386, 85.7202168003903)
            Line((-0.01797213140418375, -0.4809815834184401), (0, 0))
            ThreePointArc((0, 0), (0.23150472600432587, -0.00432363967922732), (0.46300945200865257, 0))
        make_face()
    extrude(amount=3.2032930885047257, mode=Mode.SUBTRACT)
    with BuildSketch(Plane(origin=(-0.6270425701254502, 10, -8.175990314038447), x_dir=(-0.9940617104867051, 0, 0.10881780986697823), z_dir=(0, 1, 0))) as fillet16_piece_6:
        with BuildLine():
            CenterArc((0.5165063609269088, 0.49973611680915875), FILLET16_R, 178.13843761978944, 93.72312476053929)
            Line((0.01677024411771667, 0.5159784552020568), (0, 0))
            ThreePointArc((0, 0), (0.2663743496604189, -0.0043276843297979), (0.5327486993208375, 0))
        make_face()
    extrude(amount=3.3318717483020936, mode=Mode.SUBTRACT)

    # Sketch23 → Cut-Extrude8 (cut)
    with BuildSketch(Plane(origin=(0, 10, 0), x_dir=(1, 0, 0), z_dir=(0, 1, 0))):
        Polygon((-35.208639317578275, 3.4963660888875325), (-29.021625360860476, 30.46425239543553), (4.774185082510891, 30.46425239543553), (11.635853203273454, 16.101549593024345), align=None)
    extrude(amount=-CUT_EXTRUDE8_DEPTH, mode=Mode.SUBTRACT)

    # Fillet22
    fillet22_edges = [part.edges().sort_by_distance(p)[0] for p in [
        (3.3499999999999983, 6, -13.87194490536313),
    ]]
    fillet(fillet22_edges, radius=FILLET22_R)

    # Fillet23: read off the stored shape, not the designer's step
    # Fillet23 outline → Fillet23 (revolve, cut)
    with BuildSketch(Plane(origin=(1.816687566, 0, 1.327458582), x_dir=(-0.9617079846837564, 0, -0.2740761795477815), z_dir=(0.2740761795477815, 0, -0.9617079846837564))):
        with BuildLine():
            Line((29.75, 0), (29.75, 2))
            ThreePointArc((29.75, 2), (29.164213562, 0.585786438), (27.75, 0))
            Line((27.75, 0), (29.75, 0))
        make_face()
        with BuildLine():
            ThreePointArc((27.75, 10), (29.164213562, 9.414213562), (29.75, 8))
            Line((29.75, 8), (29.75, 10))
            Line((29.75, 10), (27.75, 10))
        make_face()
    revolve(axis=Axis((1.816687566, 0, 1.327458582), (0, 1, 0)), revolution_arc=FILLET23_ANGLE, mode=Mode.SUBTRACT)


solid = part.part
